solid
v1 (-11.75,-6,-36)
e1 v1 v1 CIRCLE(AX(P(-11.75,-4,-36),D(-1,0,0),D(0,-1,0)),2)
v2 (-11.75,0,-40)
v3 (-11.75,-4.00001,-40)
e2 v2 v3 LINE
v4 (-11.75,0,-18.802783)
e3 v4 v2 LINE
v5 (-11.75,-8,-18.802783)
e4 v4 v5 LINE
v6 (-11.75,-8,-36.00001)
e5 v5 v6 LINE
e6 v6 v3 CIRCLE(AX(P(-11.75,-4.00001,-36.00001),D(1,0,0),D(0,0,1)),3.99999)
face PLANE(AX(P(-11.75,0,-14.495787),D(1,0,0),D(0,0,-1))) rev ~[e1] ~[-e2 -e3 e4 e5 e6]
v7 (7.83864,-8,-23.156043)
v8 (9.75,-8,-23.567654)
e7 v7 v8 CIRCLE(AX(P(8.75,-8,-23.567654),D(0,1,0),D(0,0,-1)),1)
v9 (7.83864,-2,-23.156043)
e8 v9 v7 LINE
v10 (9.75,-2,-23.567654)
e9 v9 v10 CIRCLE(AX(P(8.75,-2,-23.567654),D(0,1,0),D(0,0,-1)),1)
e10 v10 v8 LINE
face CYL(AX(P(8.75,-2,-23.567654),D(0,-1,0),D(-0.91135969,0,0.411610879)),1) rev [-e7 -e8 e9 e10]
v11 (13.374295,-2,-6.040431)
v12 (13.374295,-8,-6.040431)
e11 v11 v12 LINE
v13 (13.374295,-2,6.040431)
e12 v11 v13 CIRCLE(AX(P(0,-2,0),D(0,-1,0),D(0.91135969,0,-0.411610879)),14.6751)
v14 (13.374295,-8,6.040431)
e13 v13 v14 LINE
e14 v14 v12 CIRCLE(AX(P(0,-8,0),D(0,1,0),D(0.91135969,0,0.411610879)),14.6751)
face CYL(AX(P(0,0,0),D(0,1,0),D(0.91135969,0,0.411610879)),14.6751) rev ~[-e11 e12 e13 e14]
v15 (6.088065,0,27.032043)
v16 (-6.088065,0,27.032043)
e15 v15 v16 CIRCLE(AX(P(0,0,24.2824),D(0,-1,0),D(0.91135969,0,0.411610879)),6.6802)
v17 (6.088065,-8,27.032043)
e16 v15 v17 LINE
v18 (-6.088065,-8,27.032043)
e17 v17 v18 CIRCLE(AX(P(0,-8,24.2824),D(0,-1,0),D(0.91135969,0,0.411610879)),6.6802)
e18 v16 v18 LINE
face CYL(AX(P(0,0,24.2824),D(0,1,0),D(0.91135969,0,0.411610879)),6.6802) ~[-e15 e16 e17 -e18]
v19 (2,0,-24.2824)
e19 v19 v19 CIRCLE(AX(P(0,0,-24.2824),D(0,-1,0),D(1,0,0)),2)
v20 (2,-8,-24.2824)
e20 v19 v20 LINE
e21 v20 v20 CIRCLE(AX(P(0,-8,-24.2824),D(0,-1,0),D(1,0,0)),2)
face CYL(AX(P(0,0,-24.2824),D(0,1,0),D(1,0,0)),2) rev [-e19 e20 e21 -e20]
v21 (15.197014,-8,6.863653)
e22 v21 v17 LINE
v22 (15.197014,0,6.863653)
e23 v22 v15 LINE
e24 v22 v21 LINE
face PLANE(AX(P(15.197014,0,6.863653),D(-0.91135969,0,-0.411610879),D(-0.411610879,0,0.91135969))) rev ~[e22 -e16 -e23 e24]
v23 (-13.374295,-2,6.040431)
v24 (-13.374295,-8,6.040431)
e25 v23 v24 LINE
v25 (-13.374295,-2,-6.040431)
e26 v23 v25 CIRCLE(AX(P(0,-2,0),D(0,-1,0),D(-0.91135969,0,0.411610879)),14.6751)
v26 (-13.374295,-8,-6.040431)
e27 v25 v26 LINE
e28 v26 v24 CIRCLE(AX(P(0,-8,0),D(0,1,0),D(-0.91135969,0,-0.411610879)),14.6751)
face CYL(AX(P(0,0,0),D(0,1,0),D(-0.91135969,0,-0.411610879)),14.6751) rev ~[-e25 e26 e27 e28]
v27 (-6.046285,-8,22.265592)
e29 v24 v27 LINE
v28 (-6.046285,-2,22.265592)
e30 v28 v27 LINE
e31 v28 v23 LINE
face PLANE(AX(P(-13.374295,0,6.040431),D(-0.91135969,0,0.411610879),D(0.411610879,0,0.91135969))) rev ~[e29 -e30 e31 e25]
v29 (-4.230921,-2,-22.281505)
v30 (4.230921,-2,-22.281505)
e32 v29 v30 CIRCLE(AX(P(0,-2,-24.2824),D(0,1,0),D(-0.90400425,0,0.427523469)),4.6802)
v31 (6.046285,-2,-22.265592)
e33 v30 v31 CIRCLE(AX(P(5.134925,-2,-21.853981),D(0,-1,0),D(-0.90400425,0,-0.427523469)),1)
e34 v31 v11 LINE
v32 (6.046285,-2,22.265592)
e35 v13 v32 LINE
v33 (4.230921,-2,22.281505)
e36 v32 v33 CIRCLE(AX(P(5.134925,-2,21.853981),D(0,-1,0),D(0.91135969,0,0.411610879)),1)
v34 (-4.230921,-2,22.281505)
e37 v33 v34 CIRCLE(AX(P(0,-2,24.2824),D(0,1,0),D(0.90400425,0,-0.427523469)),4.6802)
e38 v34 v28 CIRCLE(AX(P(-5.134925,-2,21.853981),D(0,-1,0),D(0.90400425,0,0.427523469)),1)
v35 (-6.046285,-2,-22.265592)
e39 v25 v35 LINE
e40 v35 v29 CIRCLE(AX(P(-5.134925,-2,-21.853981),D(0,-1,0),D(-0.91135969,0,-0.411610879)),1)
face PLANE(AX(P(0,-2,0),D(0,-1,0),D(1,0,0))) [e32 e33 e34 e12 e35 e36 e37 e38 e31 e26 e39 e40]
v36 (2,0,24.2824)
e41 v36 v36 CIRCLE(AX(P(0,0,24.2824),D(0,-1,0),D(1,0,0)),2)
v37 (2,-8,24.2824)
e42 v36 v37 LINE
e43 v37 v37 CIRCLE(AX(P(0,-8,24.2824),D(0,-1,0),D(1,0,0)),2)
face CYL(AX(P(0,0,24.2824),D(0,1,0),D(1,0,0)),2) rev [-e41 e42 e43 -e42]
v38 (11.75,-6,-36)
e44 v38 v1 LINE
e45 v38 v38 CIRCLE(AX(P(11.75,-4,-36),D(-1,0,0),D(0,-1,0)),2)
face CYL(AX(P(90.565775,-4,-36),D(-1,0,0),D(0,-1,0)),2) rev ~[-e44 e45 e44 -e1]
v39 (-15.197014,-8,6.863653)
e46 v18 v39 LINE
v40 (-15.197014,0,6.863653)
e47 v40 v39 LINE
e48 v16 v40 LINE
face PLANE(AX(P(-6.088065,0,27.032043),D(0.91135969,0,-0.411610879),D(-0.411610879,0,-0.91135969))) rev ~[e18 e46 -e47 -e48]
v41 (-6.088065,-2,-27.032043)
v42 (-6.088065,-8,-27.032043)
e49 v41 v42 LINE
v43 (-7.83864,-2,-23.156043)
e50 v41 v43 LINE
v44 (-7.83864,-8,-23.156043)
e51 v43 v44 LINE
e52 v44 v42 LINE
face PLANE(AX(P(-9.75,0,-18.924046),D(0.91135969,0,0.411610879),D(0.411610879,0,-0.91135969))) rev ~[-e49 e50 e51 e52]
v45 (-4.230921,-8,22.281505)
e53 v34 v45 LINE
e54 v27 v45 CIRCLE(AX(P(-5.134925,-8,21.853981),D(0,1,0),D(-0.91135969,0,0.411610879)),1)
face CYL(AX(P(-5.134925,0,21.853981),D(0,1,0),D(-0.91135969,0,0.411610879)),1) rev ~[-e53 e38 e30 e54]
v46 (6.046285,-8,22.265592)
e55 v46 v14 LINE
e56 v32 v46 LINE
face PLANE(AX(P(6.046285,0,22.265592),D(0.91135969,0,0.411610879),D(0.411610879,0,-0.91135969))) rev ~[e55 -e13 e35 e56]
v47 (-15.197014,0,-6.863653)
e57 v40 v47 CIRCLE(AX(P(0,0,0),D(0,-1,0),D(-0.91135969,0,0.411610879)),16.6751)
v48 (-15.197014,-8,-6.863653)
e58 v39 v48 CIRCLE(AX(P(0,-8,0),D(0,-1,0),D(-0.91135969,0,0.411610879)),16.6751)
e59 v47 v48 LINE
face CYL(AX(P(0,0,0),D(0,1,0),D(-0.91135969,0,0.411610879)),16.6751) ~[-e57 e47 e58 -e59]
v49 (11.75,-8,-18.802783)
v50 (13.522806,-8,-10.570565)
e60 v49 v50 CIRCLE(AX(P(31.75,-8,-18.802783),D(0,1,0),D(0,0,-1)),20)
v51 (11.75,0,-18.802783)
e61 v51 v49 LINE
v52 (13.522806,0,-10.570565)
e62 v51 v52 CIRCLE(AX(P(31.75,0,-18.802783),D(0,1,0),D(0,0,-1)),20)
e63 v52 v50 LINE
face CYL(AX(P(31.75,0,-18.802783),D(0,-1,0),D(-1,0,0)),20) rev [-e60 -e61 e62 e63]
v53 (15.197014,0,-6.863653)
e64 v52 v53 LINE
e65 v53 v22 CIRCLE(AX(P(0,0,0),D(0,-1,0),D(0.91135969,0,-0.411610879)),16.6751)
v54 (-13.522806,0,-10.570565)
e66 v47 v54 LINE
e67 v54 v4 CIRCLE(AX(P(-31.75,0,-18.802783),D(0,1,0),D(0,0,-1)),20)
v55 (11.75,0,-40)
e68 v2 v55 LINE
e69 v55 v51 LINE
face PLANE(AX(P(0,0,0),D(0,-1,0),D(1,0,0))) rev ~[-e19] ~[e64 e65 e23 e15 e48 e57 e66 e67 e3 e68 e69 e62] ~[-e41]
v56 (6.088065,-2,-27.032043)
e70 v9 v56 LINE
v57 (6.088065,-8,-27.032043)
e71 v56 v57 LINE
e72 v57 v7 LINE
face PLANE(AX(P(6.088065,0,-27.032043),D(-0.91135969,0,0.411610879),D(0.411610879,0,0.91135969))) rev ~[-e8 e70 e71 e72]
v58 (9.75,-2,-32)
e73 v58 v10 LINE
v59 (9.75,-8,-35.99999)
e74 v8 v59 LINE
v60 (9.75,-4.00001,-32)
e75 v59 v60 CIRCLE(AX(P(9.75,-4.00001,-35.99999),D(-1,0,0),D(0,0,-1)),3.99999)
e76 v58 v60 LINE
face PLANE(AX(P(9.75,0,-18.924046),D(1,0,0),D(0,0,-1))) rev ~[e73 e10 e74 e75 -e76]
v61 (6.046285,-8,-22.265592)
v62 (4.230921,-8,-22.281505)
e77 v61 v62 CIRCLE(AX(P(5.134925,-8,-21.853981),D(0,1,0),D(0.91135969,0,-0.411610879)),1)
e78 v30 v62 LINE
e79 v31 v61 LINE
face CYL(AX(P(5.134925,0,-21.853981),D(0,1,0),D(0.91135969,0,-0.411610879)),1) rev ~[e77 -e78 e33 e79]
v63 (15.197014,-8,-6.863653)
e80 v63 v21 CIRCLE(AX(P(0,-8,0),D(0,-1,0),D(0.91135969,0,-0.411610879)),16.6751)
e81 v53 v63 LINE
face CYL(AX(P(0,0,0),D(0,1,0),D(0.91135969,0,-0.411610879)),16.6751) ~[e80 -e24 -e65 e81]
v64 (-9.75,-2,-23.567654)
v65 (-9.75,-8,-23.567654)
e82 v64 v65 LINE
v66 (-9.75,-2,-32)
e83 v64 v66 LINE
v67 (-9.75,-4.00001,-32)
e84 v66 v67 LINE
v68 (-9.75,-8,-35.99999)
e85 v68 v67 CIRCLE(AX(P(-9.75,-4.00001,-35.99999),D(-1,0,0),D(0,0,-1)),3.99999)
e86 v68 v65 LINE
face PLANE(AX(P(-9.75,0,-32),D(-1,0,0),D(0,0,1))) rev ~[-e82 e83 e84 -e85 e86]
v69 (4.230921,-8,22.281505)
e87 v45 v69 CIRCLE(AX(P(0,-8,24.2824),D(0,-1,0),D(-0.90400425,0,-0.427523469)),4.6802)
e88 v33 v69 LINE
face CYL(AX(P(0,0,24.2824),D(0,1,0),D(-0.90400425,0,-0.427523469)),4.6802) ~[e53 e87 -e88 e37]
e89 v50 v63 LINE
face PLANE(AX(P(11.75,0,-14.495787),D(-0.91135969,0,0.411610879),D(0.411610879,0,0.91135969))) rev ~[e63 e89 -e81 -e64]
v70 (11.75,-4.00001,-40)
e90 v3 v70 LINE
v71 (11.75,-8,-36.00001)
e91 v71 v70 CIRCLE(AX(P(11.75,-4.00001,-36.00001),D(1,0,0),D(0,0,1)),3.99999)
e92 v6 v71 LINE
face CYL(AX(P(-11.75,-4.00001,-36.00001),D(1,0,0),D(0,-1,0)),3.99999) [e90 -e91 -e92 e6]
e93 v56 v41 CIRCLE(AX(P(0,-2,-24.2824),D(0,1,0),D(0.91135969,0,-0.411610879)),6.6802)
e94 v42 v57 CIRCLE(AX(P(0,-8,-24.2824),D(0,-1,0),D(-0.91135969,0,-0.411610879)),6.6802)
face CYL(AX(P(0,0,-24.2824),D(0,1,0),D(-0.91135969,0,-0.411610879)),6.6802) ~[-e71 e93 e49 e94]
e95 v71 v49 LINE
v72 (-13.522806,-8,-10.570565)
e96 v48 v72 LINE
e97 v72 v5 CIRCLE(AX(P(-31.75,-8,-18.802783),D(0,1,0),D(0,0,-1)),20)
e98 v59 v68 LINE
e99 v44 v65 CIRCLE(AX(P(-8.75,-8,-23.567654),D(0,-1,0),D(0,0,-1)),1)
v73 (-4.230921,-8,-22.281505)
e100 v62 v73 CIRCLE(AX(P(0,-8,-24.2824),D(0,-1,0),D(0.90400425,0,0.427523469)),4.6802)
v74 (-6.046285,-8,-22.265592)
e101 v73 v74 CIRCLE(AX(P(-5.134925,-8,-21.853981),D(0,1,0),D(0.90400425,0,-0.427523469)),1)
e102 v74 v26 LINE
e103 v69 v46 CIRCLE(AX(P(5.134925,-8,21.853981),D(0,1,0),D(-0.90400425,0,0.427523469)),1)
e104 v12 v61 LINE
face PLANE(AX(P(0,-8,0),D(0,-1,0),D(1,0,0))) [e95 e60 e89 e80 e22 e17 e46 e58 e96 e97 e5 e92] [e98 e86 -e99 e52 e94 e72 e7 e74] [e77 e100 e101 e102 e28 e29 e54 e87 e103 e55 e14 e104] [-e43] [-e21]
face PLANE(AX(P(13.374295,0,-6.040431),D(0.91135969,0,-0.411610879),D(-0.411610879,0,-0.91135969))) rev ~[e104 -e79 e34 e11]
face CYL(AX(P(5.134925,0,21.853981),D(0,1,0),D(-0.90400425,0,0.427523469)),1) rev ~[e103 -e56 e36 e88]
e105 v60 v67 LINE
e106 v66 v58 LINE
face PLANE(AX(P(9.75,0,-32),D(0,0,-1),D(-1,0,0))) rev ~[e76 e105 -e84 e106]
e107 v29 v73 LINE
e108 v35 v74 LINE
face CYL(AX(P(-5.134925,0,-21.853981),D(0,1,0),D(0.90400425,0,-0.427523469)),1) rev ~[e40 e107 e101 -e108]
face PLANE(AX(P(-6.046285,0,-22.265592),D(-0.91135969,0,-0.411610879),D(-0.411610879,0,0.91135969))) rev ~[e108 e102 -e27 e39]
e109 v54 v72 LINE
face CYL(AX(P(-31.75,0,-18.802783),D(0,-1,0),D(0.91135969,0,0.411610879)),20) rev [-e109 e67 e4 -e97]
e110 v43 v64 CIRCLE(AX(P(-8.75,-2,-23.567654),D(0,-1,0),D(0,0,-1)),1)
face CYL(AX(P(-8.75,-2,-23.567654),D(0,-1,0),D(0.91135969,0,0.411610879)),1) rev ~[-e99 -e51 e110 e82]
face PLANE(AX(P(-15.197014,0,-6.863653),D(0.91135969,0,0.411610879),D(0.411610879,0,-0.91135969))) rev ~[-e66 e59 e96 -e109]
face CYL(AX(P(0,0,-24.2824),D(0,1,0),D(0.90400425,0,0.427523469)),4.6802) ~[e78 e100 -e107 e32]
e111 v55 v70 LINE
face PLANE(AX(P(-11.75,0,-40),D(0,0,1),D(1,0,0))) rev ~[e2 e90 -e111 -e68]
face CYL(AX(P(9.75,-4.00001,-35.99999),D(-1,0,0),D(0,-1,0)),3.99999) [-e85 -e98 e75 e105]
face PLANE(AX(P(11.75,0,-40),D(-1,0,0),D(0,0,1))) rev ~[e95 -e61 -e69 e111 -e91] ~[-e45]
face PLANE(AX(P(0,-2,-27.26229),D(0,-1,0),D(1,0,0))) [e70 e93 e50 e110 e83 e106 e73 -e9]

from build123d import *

# Parameters (mm, degrees)
F0_R     = 2
F1_DEPTH = 8
F2_DEPTH = 2
F3_R     = 20
F4_R     = 1
F6_D     = 4
F7_R     = 3.99999


# Not quite as in the source:
# - a fillet or chamfer is up to 0.001 mm smaller than in the source, because OpenCascade refuses the exact size
# - a feature names something its author has since deleted; it is built from what else it names


with BuildPart() as f1:
    # F0 (on Front) → F1 (new body)
    with BuildSketch(Plane.XZ):
        with BuildLine():
            Line((15.1970139668, 6.8636525628), (6.0880650012, 27.0320429916))
            ThreePointArc((6.0880650012, 27.0320429916), (0, 30.9626), (-6.0880650012, 27.0320429916))
            Line((-6.0880650012, 27.0320429916), (-15.1970139668, 6.8636525628))
            ThreePointArc((-15.1970139668, 6.8636525628), (-16.6751, 0), (-15.1970139668, -6.8636525628))
            Line((-15.1970139668, -6.8636525628), (-11.75, -14.4957870449))
            Line((-11.75, -14.4957870449), (-9.75, -18.9240455641))
            Line((-9.75, -18.9240455641), (-6.0880650012, -27.0320429916))
            ThreePointArc((-6.0880650012, -27.0320429916), (0, -30.9626), (6.0880650012, -27.0320429916))
            Line((6.0880650012, -27.0320429916), (9.75, -18.9240455641))
            Line((9.75, -18.9240455641), (11.75, -14.4957870449))
            Line((11.75, -14.4957870449), (15.1970139668, -6.8636525628))
            ThreePointArc((15.1970139668, -6.8636525628), (16.6751, 0), (15.1970139668, 6.8636525628))
        make_face()
        with Locations((0, -24.2824)):
            Circle(F0_R, mode=Mode.SUBTRACT)
        with BuildLine():
            Line((-13.3742945868, 6.0404308054), (-6.0462846285, 22.2655920687))
            ThreePointArc((-6.0462846285, 22.2655920687), (-5.1436901116, 22.8539427752), (-4.2309206889, 22.2815046593))
            ThreePointArc((-4.2309206889, 22.2815046593), (0, 19.6022), (4.2309206889, 22.2815046593))
            ThreePointArc((4.2309206889, 22.2815046593), (5.1436901116, 22.8539427752), (6.0462846285, 22.2655920687))
            Line((6.0462846285, 22.2655920687), (13.3742945868, 6.0404308054))
            ThreePointArc((13.3742945868, 6.0404308054), (14.6751, 0), (13.3742945868, -6.0404308054))
            Line((13.3742945868, -6.0404308054), (6.0462846285, -22.2655920687))
            ThreePointArc((6.0462846285, -22.2655920687), (5.1436901116, -22.8539427752), (4.2309206889, -22.2815046593))
            ThreePointArc((4.2309206889, -22.2815046593), (0, -19.6022), (-4.2309206889, -22.2815046593))
            ThreePointArc((-4.2309206889, -22.2815046593), (-5.1436901116, -22.8539427752), (-6.0462846285, -22.2655920687))
            Line((-6.0462846285, -22.2655920687), (-13.3742945868, -6.0404308054))
            ThreePointArc((-13.3742945868, -6.0404308054), (-14.6751, 0), (-13.3742945868, 6.0404308054))
        make_face(mode=Mode.SUBTRACT)
        with Locations((0, 24.2824)):
            Circle(F0_R, mode=Mode.SUBTRACT)
        Polygon((11.75, -40), (11.75, -14.4957870449), (9.75, -18.9240455641), (9.75, -32), (-9.75, -32), (-9.75, -18.9240455641), (-11.75, -14.4957870449), (-11.75, -40), align=None)
    extrude(amount=F1_DEPTH)

    # F0 (on Front) → F2 (join)
    with BuildSketch(Plane.XZ):
        with BuildLine():
            ThreePointArc((-4.2309206889, 22.2815046593), (-5.1436901116, 22.8539427752), (-6.0462846285, 22.2655920687))
            Line((-6.0462846285, 22.2655920687), (-13.3742945868, 6.0404308054))
            ThreePointArc((-13.3742945868, 6.0404308054), (-14.6751, 0), (-13.3742945868, -6.0404308054))
            Line((-13.3742945868, -6.0404308054), (-6.0462846285, -22.2655920687))
            ThreePointArc((-6.0462846285, -22.2655920687), (-5.1436901116, -22.8539427752), (-4.2309206889, -22.2815046593))
            ThreePointArc((-4.2309206889, -22.2815046593), (0, -19.6022), (4.2309206889, -22.2815046593))
            ThreePointArc((4.2309206889, -22.2815046593), (5.1436901116, -22.8539427752), (6.0462846285, -22.2655920687))
            Line((6.0462846285, -22.2655920687), (13.3742945868, -6.0404308054))
            ThreePointArc((13.3742945868, -6.0404308054), (14.6751, 0), (13.3742945868, 6.0404308054))
            Line((13.3742945868, 6.0404308054), (6.0462846285, 22.2655920687))
            ThreePointArc((6.0462846285, 22.2655920687), (5.1436901116, 22.8539427752), (4.2309206889, 22.2815046593))
            ThreePointArc((4.2309206889, 22.2815046593), (0, 19.6022), (-4.2309206889, 22.2815046593))
        make_face()
        with BuildLine():
            Line((9.75, -32), (9.75, -18.9240455641))
            Line((9.75, -18.9240455641), (6.0880650012, -27.0320429916))
            ThreePointArc((6.0880650012, -27.0320429916), (0, -30.9626), (-6.0880650012, -27.0320429916))
            Line((-6.0880650012, -27.0320429916), (-9.75, -18.9240455641))
            Line((-9.75, -18.9240455641), (-9.75, -32))
            Line((-9.75, -32), (9.75, -32))
        make_face()
    extrude(amount=F2_DEPTH)

    # F3
    f3_edges = [f1.edges().sort_by_distance(p)[0] for p in [
        (11.75, -4, -14.495787),
        (-11.75, -4, -14.495787),
    ]]
    fillet(f3_edges, radius=F3_R)

    # F4
    f4_edges = [f1.edges().sort_by_distance(p)[0] for p in [
        (9.75, -5, -18.924046),
        (-9.75, -5, -18.924046),
    ]]
    fillet(f4_edges, radius=F4_R)

    # F6 (through all)
    with Locations(Plane.YZ.offset(11.75)):
        with Locations((-4, -36)):
            Hole(F6_D / 2)

    # F7 (radius 4 in the source; OpenCascade refuses exactly that, so slightly less here)
    f7_edges = [f1.edges().sort_by_distance(p)[0] for p in [
        (0, -8, -40),
        (0, -8, -32),
    ]]
    fillet(f7_edges, radius=F7_R)


solid = f1.part
